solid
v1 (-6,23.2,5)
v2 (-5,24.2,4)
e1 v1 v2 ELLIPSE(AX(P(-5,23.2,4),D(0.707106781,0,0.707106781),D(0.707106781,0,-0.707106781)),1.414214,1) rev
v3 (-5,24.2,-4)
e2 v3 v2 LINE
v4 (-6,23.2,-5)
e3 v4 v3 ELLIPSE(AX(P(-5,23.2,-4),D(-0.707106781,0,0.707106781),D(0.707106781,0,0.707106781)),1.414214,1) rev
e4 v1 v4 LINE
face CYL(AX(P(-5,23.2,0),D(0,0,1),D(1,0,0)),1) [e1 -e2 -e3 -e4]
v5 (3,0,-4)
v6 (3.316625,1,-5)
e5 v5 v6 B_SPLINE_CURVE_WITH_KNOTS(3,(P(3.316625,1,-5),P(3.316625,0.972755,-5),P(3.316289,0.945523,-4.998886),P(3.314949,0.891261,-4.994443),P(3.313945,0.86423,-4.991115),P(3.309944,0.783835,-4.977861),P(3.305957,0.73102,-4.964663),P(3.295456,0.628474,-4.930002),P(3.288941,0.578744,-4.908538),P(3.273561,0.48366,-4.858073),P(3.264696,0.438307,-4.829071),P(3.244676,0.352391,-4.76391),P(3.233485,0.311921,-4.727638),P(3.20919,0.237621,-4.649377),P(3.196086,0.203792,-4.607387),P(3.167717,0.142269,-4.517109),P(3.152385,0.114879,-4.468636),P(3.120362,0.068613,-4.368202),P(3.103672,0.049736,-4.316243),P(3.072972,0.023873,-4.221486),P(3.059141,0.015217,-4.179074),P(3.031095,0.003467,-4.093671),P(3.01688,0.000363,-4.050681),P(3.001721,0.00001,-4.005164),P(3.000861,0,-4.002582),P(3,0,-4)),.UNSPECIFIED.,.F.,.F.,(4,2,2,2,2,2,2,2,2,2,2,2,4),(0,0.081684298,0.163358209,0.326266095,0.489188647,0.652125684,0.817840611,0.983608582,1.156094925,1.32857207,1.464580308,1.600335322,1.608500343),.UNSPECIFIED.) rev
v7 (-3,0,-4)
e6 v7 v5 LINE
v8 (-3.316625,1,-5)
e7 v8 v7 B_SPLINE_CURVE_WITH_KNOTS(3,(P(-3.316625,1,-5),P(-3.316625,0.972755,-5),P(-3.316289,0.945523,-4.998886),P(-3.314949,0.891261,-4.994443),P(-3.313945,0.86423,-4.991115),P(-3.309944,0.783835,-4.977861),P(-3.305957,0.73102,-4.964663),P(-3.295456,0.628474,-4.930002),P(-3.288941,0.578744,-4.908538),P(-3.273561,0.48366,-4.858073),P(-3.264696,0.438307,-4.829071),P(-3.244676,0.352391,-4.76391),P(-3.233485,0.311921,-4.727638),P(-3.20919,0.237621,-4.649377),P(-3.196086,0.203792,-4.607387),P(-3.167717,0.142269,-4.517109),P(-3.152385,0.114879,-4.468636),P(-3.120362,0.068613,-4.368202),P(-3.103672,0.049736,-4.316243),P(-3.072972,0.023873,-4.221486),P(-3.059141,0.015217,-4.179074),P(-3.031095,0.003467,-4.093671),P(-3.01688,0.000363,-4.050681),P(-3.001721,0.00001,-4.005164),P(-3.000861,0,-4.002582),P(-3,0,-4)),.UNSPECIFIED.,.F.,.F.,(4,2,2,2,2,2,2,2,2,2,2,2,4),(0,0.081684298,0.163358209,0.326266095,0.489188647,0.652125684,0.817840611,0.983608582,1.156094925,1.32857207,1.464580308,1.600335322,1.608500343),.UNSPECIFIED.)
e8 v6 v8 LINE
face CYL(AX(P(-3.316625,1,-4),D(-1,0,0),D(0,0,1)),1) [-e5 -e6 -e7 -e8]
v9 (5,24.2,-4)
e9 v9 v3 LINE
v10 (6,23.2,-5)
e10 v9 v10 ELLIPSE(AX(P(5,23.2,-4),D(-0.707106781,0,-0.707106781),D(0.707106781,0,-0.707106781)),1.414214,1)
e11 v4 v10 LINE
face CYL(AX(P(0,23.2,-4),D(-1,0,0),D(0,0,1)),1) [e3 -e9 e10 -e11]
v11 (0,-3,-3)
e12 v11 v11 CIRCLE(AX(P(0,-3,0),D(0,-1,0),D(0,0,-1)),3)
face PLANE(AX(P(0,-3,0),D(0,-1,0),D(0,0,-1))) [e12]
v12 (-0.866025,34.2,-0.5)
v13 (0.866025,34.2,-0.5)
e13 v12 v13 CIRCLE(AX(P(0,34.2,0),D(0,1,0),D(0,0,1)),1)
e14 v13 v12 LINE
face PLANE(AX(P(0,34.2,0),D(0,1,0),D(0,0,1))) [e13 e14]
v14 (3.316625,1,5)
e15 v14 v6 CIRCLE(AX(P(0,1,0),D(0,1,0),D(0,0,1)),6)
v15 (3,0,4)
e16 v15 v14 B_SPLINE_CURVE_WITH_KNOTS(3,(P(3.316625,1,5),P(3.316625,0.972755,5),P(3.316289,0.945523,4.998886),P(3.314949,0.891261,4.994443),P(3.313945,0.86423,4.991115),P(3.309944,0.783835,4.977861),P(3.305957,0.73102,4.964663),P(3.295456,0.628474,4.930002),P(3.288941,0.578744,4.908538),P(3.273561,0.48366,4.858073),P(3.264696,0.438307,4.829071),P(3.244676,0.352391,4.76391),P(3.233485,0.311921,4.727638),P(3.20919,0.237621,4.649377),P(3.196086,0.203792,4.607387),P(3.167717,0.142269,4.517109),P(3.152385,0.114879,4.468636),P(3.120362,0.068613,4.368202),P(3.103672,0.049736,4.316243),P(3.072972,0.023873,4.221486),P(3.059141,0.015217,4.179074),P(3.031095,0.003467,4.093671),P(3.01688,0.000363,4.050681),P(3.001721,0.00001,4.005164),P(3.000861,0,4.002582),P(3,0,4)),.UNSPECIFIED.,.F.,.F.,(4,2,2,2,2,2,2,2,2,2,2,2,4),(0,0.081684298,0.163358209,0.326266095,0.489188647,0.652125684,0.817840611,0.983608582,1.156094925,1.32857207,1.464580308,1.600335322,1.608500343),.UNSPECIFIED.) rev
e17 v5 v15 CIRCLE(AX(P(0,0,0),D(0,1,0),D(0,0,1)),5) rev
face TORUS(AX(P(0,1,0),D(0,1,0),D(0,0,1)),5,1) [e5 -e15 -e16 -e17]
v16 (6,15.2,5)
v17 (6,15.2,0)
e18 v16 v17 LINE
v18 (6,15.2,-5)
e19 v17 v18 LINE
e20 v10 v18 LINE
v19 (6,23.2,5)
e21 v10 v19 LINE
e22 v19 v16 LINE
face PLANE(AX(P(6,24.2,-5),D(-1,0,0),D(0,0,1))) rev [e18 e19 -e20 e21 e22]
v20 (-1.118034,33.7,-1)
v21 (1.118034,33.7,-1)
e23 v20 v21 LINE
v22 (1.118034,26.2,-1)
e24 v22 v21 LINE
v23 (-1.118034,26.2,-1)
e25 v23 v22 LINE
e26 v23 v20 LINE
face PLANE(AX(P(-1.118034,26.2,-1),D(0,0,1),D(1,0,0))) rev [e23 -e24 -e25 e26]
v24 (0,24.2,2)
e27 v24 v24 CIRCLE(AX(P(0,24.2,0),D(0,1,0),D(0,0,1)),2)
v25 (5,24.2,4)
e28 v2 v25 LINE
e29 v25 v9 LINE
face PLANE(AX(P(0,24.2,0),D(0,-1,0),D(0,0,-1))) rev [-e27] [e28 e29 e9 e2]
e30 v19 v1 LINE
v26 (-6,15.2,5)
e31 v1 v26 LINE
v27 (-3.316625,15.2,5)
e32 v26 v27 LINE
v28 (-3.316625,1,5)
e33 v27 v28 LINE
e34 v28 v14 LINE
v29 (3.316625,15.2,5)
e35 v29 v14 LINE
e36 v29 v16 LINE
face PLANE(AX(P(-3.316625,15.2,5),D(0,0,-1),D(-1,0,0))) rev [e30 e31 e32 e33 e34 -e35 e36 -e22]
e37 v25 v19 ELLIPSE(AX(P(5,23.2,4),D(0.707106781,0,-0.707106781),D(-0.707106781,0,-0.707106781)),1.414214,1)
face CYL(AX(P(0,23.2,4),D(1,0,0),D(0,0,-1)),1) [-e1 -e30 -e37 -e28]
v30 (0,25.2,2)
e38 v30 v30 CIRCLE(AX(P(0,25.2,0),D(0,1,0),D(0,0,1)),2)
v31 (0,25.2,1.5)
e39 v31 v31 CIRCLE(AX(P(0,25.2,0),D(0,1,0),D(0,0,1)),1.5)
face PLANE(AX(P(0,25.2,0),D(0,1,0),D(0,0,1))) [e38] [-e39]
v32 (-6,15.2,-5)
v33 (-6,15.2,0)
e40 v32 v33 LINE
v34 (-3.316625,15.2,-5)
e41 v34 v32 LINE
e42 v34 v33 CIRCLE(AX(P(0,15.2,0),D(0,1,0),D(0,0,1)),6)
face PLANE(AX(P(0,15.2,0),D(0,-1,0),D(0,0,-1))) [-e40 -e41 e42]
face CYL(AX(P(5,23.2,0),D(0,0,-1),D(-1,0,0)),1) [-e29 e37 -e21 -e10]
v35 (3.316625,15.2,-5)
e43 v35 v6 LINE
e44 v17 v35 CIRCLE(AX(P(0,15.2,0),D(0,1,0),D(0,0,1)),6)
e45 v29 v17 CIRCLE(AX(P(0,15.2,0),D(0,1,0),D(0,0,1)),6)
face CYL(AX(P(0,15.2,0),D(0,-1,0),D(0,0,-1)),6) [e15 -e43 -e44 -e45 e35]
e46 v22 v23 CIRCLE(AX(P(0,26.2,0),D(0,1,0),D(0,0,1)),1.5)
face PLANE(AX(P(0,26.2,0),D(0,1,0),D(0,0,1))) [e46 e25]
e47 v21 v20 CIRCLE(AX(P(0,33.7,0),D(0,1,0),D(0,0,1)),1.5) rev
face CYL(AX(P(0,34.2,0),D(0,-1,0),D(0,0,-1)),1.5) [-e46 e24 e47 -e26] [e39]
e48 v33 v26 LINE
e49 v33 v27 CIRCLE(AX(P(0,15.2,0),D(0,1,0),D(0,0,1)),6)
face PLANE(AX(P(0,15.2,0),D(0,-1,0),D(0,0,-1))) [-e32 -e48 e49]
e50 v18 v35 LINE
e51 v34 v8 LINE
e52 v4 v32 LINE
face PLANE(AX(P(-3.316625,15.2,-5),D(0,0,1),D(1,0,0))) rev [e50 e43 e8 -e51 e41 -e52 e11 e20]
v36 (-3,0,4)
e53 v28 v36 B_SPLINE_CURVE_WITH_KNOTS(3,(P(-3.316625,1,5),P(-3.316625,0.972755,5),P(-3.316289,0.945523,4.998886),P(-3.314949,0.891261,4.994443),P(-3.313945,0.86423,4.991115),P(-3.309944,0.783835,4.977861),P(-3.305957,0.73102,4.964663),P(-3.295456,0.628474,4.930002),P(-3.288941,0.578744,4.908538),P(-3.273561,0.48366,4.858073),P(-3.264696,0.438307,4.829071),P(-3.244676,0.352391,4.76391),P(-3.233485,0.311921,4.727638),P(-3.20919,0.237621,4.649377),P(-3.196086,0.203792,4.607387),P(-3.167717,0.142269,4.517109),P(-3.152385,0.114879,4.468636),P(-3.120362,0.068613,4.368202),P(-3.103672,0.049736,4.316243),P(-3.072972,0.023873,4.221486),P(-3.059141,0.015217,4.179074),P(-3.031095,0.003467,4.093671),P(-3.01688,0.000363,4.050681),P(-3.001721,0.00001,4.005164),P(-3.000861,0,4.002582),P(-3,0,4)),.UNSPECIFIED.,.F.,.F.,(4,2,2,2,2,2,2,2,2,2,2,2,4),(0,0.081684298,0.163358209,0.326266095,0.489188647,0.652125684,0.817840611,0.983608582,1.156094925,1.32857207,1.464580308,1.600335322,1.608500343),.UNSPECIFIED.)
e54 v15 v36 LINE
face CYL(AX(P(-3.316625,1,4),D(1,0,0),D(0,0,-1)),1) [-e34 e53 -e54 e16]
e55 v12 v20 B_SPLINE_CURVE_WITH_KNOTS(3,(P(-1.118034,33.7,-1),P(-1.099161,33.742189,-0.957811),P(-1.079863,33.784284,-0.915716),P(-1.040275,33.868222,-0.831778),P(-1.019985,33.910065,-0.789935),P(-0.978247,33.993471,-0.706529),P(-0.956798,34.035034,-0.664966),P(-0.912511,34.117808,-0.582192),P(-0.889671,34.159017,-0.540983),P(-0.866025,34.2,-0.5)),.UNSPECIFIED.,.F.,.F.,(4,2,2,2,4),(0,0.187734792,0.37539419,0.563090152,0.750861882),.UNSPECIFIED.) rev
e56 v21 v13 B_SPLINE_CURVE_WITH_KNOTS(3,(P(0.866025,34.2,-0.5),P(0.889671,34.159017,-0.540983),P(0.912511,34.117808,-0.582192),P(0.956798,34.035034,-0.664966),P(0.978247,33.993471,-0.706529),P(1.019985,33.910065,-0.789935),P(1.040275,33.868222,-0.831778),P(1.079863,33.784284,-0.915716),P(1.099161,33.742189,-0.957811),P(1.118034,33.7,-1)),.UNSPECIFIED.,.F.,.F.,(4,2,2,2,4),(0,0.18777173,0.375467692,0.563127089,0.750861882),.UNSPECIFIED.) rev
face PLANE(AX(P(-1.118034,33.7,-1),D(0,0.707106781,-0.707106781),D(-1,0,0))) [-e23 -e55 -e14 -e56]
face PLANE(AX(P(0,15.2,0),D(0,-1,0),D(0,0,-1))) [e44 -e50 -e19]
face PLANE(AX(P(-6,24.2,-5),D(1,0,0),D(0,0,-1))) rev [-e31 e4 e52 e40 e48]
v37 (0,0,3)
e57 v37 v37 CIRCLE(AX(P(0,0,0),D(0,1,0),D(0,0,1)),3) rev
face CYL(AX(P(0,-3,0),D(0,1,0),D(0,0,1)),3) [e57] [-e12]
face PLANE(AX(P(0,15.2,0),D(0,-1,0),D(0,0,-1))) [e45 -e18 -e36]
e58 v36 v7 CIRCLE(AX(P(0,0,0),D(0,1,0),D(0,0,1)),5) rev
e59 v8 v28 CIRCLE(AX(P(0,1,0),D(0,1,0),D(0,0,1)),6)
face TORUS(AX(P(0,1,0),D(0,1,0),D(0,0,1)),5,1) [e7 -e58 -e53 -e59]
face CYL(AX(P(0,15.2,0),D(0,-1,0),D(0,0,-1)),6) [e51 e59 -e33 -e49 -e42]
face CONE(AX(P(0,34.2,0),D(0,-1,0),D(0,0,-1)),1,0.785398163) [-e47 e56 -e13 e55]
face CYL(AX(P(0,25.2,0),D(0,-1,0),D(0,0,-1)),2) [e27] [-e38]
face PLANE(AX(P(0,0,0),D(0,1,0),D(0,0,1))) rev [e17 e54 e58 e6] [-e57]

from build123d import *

# Parameters (mm, degrees)
EXTRUDE_2_DEPTH     = 15.2
SKETCH_4_W          = 12
SKETCH_4_H          = 10
EXTRUDE_3_DEPTH     = 9
SKETCH_5_R          = 2
EXTRUDE_4_DEPTH     = 1
SKETCH_6_R          = 1.5
EXTRUDE_5_DEPTH     = 9
CUT_EXTRUDE_START   = -8
CUT_EXTRUDE_2_DEPTH = 8
CHAMFER_1_SIZE      = 0.5
FILLET_1_R          = 1
SKETCH_8_R          = 3
EXTRUDE_6_DEPTH     = 3


with BuildPart() as part:
    # Эскиз3 → Бобышка-Вытянуть2 (new body)
    with BuildSketch(Plane(origin=(0, 0, 0), x_dir=(1, 0, 0), z_dir=(0, 1, 0))):
        with BuildLine():
            Line((-3.31662479, -5), (3.31662479, -5))
            ThreePointArc((3.31662479, -5), (6, 0), (3.31662479, 5))
            Line((3.31662479, 5), (-3.31662479, 5))
            ThreePointArc((-3.31662479, 5), (-6, 0), (-3.31662479, -5))
        make_face()
    extrude(amount=EXTRUDE_2_DEPTH)

    # Эскиз4 → Бобышка-Вытянуть3 (add)
    with BuildSketch(Plane(origin=(0, 15.2, 0), x_dir=(1, 0, 0), z_dir=(0, 1, 0))):
        Rectangle(SKETCH_4_W, SKETCH_4_H)
    extrude(amount=EXTRUDE_3_DEPTH)

    # Эскиз5 → Бобышка-Вытянуть4 (add)
    with BuildSketch(Plane(origin=(0, 24.2, 0), x_dir=(1, 0, 0), z_dir=(0, 1, 0))):
        with Locations(Location((0, 0, 0), (0, 0, 270))):
            Circle(SKETCH_5_R)
    extrude(amount=EXTRUDE_4_DEPTH)

    # Эскиз6 → Бобышка-Вытянуть5 (add)
    with BuildSketch(Plane(origin=(0, 25.2, 0), x_dir=(1, 0, 0), z_dir=(0, 1, 0))):
        with Locations(Location((0, 0, 0), (0, 0, 270))):
            Circle(SKETCH_6_R)
    extrude(amount=EXTRUDE_5_DEPTH)

    # Эскиз7 → Вырез-Вытянуть2 (cut)
    with BuildSketch(Plane(origin=(0, 34.2, 0), x_dir=(1, 0, 0), z_dir=(0, 1, 0)).offset(CUT_EXTRUDE_START)):
        with BuildLine():
            Line((-1.118033989, 1), (1.118033989, 1))
            ThreePointArc((1.118033989, 1), (0, 1.5), (-1.118033989, 1))
        make_face()
    extrude(amount=CUT_EXTRUDE_2_DEPTH, mode=Mode.SUBTRACT)

    # Фаска1
    chamfer_1_edges = [part.edges().sort_by_distance(p)[0] for p in [
        (-1.369306394, 34.2, 0.612372436),
        (0, 34.2, -1),
    ]]
    chamfer(chamfer_1_edges, length=CHAMFER_1_SIZE - 0.0001)  # a hair under: the kernel refuses the full size

    # Скругление1
    fillet_1_edges = [part.edges().sort_by_distance(p)[0] for p in [
        (-6, 24.2, 0),
        (0, 24.2, 5),
        (6, 24.2, 0),
        (0, 24.2, -5),
        (0, 0, -5),
        (6, 0, 0),
        (0, 0, 5),
        (-6, 0, 0),
    ]]
    fillet(fillet_1_edges, radius=FILLET_1_R - 0.0001)  # a hair under: the kernel refuses the full size

    # Эскиз8 → Бобышка-Вытянуть6 (add)
    with BuildSketch(Plane.XZ):
        with Locations(Location((0, 0, 0), (0, 0, 90))):
            Circle(SKETCH_8_R)
    extrude(amount=EXTRUDE_6_DEPTH)


solid = part.part
